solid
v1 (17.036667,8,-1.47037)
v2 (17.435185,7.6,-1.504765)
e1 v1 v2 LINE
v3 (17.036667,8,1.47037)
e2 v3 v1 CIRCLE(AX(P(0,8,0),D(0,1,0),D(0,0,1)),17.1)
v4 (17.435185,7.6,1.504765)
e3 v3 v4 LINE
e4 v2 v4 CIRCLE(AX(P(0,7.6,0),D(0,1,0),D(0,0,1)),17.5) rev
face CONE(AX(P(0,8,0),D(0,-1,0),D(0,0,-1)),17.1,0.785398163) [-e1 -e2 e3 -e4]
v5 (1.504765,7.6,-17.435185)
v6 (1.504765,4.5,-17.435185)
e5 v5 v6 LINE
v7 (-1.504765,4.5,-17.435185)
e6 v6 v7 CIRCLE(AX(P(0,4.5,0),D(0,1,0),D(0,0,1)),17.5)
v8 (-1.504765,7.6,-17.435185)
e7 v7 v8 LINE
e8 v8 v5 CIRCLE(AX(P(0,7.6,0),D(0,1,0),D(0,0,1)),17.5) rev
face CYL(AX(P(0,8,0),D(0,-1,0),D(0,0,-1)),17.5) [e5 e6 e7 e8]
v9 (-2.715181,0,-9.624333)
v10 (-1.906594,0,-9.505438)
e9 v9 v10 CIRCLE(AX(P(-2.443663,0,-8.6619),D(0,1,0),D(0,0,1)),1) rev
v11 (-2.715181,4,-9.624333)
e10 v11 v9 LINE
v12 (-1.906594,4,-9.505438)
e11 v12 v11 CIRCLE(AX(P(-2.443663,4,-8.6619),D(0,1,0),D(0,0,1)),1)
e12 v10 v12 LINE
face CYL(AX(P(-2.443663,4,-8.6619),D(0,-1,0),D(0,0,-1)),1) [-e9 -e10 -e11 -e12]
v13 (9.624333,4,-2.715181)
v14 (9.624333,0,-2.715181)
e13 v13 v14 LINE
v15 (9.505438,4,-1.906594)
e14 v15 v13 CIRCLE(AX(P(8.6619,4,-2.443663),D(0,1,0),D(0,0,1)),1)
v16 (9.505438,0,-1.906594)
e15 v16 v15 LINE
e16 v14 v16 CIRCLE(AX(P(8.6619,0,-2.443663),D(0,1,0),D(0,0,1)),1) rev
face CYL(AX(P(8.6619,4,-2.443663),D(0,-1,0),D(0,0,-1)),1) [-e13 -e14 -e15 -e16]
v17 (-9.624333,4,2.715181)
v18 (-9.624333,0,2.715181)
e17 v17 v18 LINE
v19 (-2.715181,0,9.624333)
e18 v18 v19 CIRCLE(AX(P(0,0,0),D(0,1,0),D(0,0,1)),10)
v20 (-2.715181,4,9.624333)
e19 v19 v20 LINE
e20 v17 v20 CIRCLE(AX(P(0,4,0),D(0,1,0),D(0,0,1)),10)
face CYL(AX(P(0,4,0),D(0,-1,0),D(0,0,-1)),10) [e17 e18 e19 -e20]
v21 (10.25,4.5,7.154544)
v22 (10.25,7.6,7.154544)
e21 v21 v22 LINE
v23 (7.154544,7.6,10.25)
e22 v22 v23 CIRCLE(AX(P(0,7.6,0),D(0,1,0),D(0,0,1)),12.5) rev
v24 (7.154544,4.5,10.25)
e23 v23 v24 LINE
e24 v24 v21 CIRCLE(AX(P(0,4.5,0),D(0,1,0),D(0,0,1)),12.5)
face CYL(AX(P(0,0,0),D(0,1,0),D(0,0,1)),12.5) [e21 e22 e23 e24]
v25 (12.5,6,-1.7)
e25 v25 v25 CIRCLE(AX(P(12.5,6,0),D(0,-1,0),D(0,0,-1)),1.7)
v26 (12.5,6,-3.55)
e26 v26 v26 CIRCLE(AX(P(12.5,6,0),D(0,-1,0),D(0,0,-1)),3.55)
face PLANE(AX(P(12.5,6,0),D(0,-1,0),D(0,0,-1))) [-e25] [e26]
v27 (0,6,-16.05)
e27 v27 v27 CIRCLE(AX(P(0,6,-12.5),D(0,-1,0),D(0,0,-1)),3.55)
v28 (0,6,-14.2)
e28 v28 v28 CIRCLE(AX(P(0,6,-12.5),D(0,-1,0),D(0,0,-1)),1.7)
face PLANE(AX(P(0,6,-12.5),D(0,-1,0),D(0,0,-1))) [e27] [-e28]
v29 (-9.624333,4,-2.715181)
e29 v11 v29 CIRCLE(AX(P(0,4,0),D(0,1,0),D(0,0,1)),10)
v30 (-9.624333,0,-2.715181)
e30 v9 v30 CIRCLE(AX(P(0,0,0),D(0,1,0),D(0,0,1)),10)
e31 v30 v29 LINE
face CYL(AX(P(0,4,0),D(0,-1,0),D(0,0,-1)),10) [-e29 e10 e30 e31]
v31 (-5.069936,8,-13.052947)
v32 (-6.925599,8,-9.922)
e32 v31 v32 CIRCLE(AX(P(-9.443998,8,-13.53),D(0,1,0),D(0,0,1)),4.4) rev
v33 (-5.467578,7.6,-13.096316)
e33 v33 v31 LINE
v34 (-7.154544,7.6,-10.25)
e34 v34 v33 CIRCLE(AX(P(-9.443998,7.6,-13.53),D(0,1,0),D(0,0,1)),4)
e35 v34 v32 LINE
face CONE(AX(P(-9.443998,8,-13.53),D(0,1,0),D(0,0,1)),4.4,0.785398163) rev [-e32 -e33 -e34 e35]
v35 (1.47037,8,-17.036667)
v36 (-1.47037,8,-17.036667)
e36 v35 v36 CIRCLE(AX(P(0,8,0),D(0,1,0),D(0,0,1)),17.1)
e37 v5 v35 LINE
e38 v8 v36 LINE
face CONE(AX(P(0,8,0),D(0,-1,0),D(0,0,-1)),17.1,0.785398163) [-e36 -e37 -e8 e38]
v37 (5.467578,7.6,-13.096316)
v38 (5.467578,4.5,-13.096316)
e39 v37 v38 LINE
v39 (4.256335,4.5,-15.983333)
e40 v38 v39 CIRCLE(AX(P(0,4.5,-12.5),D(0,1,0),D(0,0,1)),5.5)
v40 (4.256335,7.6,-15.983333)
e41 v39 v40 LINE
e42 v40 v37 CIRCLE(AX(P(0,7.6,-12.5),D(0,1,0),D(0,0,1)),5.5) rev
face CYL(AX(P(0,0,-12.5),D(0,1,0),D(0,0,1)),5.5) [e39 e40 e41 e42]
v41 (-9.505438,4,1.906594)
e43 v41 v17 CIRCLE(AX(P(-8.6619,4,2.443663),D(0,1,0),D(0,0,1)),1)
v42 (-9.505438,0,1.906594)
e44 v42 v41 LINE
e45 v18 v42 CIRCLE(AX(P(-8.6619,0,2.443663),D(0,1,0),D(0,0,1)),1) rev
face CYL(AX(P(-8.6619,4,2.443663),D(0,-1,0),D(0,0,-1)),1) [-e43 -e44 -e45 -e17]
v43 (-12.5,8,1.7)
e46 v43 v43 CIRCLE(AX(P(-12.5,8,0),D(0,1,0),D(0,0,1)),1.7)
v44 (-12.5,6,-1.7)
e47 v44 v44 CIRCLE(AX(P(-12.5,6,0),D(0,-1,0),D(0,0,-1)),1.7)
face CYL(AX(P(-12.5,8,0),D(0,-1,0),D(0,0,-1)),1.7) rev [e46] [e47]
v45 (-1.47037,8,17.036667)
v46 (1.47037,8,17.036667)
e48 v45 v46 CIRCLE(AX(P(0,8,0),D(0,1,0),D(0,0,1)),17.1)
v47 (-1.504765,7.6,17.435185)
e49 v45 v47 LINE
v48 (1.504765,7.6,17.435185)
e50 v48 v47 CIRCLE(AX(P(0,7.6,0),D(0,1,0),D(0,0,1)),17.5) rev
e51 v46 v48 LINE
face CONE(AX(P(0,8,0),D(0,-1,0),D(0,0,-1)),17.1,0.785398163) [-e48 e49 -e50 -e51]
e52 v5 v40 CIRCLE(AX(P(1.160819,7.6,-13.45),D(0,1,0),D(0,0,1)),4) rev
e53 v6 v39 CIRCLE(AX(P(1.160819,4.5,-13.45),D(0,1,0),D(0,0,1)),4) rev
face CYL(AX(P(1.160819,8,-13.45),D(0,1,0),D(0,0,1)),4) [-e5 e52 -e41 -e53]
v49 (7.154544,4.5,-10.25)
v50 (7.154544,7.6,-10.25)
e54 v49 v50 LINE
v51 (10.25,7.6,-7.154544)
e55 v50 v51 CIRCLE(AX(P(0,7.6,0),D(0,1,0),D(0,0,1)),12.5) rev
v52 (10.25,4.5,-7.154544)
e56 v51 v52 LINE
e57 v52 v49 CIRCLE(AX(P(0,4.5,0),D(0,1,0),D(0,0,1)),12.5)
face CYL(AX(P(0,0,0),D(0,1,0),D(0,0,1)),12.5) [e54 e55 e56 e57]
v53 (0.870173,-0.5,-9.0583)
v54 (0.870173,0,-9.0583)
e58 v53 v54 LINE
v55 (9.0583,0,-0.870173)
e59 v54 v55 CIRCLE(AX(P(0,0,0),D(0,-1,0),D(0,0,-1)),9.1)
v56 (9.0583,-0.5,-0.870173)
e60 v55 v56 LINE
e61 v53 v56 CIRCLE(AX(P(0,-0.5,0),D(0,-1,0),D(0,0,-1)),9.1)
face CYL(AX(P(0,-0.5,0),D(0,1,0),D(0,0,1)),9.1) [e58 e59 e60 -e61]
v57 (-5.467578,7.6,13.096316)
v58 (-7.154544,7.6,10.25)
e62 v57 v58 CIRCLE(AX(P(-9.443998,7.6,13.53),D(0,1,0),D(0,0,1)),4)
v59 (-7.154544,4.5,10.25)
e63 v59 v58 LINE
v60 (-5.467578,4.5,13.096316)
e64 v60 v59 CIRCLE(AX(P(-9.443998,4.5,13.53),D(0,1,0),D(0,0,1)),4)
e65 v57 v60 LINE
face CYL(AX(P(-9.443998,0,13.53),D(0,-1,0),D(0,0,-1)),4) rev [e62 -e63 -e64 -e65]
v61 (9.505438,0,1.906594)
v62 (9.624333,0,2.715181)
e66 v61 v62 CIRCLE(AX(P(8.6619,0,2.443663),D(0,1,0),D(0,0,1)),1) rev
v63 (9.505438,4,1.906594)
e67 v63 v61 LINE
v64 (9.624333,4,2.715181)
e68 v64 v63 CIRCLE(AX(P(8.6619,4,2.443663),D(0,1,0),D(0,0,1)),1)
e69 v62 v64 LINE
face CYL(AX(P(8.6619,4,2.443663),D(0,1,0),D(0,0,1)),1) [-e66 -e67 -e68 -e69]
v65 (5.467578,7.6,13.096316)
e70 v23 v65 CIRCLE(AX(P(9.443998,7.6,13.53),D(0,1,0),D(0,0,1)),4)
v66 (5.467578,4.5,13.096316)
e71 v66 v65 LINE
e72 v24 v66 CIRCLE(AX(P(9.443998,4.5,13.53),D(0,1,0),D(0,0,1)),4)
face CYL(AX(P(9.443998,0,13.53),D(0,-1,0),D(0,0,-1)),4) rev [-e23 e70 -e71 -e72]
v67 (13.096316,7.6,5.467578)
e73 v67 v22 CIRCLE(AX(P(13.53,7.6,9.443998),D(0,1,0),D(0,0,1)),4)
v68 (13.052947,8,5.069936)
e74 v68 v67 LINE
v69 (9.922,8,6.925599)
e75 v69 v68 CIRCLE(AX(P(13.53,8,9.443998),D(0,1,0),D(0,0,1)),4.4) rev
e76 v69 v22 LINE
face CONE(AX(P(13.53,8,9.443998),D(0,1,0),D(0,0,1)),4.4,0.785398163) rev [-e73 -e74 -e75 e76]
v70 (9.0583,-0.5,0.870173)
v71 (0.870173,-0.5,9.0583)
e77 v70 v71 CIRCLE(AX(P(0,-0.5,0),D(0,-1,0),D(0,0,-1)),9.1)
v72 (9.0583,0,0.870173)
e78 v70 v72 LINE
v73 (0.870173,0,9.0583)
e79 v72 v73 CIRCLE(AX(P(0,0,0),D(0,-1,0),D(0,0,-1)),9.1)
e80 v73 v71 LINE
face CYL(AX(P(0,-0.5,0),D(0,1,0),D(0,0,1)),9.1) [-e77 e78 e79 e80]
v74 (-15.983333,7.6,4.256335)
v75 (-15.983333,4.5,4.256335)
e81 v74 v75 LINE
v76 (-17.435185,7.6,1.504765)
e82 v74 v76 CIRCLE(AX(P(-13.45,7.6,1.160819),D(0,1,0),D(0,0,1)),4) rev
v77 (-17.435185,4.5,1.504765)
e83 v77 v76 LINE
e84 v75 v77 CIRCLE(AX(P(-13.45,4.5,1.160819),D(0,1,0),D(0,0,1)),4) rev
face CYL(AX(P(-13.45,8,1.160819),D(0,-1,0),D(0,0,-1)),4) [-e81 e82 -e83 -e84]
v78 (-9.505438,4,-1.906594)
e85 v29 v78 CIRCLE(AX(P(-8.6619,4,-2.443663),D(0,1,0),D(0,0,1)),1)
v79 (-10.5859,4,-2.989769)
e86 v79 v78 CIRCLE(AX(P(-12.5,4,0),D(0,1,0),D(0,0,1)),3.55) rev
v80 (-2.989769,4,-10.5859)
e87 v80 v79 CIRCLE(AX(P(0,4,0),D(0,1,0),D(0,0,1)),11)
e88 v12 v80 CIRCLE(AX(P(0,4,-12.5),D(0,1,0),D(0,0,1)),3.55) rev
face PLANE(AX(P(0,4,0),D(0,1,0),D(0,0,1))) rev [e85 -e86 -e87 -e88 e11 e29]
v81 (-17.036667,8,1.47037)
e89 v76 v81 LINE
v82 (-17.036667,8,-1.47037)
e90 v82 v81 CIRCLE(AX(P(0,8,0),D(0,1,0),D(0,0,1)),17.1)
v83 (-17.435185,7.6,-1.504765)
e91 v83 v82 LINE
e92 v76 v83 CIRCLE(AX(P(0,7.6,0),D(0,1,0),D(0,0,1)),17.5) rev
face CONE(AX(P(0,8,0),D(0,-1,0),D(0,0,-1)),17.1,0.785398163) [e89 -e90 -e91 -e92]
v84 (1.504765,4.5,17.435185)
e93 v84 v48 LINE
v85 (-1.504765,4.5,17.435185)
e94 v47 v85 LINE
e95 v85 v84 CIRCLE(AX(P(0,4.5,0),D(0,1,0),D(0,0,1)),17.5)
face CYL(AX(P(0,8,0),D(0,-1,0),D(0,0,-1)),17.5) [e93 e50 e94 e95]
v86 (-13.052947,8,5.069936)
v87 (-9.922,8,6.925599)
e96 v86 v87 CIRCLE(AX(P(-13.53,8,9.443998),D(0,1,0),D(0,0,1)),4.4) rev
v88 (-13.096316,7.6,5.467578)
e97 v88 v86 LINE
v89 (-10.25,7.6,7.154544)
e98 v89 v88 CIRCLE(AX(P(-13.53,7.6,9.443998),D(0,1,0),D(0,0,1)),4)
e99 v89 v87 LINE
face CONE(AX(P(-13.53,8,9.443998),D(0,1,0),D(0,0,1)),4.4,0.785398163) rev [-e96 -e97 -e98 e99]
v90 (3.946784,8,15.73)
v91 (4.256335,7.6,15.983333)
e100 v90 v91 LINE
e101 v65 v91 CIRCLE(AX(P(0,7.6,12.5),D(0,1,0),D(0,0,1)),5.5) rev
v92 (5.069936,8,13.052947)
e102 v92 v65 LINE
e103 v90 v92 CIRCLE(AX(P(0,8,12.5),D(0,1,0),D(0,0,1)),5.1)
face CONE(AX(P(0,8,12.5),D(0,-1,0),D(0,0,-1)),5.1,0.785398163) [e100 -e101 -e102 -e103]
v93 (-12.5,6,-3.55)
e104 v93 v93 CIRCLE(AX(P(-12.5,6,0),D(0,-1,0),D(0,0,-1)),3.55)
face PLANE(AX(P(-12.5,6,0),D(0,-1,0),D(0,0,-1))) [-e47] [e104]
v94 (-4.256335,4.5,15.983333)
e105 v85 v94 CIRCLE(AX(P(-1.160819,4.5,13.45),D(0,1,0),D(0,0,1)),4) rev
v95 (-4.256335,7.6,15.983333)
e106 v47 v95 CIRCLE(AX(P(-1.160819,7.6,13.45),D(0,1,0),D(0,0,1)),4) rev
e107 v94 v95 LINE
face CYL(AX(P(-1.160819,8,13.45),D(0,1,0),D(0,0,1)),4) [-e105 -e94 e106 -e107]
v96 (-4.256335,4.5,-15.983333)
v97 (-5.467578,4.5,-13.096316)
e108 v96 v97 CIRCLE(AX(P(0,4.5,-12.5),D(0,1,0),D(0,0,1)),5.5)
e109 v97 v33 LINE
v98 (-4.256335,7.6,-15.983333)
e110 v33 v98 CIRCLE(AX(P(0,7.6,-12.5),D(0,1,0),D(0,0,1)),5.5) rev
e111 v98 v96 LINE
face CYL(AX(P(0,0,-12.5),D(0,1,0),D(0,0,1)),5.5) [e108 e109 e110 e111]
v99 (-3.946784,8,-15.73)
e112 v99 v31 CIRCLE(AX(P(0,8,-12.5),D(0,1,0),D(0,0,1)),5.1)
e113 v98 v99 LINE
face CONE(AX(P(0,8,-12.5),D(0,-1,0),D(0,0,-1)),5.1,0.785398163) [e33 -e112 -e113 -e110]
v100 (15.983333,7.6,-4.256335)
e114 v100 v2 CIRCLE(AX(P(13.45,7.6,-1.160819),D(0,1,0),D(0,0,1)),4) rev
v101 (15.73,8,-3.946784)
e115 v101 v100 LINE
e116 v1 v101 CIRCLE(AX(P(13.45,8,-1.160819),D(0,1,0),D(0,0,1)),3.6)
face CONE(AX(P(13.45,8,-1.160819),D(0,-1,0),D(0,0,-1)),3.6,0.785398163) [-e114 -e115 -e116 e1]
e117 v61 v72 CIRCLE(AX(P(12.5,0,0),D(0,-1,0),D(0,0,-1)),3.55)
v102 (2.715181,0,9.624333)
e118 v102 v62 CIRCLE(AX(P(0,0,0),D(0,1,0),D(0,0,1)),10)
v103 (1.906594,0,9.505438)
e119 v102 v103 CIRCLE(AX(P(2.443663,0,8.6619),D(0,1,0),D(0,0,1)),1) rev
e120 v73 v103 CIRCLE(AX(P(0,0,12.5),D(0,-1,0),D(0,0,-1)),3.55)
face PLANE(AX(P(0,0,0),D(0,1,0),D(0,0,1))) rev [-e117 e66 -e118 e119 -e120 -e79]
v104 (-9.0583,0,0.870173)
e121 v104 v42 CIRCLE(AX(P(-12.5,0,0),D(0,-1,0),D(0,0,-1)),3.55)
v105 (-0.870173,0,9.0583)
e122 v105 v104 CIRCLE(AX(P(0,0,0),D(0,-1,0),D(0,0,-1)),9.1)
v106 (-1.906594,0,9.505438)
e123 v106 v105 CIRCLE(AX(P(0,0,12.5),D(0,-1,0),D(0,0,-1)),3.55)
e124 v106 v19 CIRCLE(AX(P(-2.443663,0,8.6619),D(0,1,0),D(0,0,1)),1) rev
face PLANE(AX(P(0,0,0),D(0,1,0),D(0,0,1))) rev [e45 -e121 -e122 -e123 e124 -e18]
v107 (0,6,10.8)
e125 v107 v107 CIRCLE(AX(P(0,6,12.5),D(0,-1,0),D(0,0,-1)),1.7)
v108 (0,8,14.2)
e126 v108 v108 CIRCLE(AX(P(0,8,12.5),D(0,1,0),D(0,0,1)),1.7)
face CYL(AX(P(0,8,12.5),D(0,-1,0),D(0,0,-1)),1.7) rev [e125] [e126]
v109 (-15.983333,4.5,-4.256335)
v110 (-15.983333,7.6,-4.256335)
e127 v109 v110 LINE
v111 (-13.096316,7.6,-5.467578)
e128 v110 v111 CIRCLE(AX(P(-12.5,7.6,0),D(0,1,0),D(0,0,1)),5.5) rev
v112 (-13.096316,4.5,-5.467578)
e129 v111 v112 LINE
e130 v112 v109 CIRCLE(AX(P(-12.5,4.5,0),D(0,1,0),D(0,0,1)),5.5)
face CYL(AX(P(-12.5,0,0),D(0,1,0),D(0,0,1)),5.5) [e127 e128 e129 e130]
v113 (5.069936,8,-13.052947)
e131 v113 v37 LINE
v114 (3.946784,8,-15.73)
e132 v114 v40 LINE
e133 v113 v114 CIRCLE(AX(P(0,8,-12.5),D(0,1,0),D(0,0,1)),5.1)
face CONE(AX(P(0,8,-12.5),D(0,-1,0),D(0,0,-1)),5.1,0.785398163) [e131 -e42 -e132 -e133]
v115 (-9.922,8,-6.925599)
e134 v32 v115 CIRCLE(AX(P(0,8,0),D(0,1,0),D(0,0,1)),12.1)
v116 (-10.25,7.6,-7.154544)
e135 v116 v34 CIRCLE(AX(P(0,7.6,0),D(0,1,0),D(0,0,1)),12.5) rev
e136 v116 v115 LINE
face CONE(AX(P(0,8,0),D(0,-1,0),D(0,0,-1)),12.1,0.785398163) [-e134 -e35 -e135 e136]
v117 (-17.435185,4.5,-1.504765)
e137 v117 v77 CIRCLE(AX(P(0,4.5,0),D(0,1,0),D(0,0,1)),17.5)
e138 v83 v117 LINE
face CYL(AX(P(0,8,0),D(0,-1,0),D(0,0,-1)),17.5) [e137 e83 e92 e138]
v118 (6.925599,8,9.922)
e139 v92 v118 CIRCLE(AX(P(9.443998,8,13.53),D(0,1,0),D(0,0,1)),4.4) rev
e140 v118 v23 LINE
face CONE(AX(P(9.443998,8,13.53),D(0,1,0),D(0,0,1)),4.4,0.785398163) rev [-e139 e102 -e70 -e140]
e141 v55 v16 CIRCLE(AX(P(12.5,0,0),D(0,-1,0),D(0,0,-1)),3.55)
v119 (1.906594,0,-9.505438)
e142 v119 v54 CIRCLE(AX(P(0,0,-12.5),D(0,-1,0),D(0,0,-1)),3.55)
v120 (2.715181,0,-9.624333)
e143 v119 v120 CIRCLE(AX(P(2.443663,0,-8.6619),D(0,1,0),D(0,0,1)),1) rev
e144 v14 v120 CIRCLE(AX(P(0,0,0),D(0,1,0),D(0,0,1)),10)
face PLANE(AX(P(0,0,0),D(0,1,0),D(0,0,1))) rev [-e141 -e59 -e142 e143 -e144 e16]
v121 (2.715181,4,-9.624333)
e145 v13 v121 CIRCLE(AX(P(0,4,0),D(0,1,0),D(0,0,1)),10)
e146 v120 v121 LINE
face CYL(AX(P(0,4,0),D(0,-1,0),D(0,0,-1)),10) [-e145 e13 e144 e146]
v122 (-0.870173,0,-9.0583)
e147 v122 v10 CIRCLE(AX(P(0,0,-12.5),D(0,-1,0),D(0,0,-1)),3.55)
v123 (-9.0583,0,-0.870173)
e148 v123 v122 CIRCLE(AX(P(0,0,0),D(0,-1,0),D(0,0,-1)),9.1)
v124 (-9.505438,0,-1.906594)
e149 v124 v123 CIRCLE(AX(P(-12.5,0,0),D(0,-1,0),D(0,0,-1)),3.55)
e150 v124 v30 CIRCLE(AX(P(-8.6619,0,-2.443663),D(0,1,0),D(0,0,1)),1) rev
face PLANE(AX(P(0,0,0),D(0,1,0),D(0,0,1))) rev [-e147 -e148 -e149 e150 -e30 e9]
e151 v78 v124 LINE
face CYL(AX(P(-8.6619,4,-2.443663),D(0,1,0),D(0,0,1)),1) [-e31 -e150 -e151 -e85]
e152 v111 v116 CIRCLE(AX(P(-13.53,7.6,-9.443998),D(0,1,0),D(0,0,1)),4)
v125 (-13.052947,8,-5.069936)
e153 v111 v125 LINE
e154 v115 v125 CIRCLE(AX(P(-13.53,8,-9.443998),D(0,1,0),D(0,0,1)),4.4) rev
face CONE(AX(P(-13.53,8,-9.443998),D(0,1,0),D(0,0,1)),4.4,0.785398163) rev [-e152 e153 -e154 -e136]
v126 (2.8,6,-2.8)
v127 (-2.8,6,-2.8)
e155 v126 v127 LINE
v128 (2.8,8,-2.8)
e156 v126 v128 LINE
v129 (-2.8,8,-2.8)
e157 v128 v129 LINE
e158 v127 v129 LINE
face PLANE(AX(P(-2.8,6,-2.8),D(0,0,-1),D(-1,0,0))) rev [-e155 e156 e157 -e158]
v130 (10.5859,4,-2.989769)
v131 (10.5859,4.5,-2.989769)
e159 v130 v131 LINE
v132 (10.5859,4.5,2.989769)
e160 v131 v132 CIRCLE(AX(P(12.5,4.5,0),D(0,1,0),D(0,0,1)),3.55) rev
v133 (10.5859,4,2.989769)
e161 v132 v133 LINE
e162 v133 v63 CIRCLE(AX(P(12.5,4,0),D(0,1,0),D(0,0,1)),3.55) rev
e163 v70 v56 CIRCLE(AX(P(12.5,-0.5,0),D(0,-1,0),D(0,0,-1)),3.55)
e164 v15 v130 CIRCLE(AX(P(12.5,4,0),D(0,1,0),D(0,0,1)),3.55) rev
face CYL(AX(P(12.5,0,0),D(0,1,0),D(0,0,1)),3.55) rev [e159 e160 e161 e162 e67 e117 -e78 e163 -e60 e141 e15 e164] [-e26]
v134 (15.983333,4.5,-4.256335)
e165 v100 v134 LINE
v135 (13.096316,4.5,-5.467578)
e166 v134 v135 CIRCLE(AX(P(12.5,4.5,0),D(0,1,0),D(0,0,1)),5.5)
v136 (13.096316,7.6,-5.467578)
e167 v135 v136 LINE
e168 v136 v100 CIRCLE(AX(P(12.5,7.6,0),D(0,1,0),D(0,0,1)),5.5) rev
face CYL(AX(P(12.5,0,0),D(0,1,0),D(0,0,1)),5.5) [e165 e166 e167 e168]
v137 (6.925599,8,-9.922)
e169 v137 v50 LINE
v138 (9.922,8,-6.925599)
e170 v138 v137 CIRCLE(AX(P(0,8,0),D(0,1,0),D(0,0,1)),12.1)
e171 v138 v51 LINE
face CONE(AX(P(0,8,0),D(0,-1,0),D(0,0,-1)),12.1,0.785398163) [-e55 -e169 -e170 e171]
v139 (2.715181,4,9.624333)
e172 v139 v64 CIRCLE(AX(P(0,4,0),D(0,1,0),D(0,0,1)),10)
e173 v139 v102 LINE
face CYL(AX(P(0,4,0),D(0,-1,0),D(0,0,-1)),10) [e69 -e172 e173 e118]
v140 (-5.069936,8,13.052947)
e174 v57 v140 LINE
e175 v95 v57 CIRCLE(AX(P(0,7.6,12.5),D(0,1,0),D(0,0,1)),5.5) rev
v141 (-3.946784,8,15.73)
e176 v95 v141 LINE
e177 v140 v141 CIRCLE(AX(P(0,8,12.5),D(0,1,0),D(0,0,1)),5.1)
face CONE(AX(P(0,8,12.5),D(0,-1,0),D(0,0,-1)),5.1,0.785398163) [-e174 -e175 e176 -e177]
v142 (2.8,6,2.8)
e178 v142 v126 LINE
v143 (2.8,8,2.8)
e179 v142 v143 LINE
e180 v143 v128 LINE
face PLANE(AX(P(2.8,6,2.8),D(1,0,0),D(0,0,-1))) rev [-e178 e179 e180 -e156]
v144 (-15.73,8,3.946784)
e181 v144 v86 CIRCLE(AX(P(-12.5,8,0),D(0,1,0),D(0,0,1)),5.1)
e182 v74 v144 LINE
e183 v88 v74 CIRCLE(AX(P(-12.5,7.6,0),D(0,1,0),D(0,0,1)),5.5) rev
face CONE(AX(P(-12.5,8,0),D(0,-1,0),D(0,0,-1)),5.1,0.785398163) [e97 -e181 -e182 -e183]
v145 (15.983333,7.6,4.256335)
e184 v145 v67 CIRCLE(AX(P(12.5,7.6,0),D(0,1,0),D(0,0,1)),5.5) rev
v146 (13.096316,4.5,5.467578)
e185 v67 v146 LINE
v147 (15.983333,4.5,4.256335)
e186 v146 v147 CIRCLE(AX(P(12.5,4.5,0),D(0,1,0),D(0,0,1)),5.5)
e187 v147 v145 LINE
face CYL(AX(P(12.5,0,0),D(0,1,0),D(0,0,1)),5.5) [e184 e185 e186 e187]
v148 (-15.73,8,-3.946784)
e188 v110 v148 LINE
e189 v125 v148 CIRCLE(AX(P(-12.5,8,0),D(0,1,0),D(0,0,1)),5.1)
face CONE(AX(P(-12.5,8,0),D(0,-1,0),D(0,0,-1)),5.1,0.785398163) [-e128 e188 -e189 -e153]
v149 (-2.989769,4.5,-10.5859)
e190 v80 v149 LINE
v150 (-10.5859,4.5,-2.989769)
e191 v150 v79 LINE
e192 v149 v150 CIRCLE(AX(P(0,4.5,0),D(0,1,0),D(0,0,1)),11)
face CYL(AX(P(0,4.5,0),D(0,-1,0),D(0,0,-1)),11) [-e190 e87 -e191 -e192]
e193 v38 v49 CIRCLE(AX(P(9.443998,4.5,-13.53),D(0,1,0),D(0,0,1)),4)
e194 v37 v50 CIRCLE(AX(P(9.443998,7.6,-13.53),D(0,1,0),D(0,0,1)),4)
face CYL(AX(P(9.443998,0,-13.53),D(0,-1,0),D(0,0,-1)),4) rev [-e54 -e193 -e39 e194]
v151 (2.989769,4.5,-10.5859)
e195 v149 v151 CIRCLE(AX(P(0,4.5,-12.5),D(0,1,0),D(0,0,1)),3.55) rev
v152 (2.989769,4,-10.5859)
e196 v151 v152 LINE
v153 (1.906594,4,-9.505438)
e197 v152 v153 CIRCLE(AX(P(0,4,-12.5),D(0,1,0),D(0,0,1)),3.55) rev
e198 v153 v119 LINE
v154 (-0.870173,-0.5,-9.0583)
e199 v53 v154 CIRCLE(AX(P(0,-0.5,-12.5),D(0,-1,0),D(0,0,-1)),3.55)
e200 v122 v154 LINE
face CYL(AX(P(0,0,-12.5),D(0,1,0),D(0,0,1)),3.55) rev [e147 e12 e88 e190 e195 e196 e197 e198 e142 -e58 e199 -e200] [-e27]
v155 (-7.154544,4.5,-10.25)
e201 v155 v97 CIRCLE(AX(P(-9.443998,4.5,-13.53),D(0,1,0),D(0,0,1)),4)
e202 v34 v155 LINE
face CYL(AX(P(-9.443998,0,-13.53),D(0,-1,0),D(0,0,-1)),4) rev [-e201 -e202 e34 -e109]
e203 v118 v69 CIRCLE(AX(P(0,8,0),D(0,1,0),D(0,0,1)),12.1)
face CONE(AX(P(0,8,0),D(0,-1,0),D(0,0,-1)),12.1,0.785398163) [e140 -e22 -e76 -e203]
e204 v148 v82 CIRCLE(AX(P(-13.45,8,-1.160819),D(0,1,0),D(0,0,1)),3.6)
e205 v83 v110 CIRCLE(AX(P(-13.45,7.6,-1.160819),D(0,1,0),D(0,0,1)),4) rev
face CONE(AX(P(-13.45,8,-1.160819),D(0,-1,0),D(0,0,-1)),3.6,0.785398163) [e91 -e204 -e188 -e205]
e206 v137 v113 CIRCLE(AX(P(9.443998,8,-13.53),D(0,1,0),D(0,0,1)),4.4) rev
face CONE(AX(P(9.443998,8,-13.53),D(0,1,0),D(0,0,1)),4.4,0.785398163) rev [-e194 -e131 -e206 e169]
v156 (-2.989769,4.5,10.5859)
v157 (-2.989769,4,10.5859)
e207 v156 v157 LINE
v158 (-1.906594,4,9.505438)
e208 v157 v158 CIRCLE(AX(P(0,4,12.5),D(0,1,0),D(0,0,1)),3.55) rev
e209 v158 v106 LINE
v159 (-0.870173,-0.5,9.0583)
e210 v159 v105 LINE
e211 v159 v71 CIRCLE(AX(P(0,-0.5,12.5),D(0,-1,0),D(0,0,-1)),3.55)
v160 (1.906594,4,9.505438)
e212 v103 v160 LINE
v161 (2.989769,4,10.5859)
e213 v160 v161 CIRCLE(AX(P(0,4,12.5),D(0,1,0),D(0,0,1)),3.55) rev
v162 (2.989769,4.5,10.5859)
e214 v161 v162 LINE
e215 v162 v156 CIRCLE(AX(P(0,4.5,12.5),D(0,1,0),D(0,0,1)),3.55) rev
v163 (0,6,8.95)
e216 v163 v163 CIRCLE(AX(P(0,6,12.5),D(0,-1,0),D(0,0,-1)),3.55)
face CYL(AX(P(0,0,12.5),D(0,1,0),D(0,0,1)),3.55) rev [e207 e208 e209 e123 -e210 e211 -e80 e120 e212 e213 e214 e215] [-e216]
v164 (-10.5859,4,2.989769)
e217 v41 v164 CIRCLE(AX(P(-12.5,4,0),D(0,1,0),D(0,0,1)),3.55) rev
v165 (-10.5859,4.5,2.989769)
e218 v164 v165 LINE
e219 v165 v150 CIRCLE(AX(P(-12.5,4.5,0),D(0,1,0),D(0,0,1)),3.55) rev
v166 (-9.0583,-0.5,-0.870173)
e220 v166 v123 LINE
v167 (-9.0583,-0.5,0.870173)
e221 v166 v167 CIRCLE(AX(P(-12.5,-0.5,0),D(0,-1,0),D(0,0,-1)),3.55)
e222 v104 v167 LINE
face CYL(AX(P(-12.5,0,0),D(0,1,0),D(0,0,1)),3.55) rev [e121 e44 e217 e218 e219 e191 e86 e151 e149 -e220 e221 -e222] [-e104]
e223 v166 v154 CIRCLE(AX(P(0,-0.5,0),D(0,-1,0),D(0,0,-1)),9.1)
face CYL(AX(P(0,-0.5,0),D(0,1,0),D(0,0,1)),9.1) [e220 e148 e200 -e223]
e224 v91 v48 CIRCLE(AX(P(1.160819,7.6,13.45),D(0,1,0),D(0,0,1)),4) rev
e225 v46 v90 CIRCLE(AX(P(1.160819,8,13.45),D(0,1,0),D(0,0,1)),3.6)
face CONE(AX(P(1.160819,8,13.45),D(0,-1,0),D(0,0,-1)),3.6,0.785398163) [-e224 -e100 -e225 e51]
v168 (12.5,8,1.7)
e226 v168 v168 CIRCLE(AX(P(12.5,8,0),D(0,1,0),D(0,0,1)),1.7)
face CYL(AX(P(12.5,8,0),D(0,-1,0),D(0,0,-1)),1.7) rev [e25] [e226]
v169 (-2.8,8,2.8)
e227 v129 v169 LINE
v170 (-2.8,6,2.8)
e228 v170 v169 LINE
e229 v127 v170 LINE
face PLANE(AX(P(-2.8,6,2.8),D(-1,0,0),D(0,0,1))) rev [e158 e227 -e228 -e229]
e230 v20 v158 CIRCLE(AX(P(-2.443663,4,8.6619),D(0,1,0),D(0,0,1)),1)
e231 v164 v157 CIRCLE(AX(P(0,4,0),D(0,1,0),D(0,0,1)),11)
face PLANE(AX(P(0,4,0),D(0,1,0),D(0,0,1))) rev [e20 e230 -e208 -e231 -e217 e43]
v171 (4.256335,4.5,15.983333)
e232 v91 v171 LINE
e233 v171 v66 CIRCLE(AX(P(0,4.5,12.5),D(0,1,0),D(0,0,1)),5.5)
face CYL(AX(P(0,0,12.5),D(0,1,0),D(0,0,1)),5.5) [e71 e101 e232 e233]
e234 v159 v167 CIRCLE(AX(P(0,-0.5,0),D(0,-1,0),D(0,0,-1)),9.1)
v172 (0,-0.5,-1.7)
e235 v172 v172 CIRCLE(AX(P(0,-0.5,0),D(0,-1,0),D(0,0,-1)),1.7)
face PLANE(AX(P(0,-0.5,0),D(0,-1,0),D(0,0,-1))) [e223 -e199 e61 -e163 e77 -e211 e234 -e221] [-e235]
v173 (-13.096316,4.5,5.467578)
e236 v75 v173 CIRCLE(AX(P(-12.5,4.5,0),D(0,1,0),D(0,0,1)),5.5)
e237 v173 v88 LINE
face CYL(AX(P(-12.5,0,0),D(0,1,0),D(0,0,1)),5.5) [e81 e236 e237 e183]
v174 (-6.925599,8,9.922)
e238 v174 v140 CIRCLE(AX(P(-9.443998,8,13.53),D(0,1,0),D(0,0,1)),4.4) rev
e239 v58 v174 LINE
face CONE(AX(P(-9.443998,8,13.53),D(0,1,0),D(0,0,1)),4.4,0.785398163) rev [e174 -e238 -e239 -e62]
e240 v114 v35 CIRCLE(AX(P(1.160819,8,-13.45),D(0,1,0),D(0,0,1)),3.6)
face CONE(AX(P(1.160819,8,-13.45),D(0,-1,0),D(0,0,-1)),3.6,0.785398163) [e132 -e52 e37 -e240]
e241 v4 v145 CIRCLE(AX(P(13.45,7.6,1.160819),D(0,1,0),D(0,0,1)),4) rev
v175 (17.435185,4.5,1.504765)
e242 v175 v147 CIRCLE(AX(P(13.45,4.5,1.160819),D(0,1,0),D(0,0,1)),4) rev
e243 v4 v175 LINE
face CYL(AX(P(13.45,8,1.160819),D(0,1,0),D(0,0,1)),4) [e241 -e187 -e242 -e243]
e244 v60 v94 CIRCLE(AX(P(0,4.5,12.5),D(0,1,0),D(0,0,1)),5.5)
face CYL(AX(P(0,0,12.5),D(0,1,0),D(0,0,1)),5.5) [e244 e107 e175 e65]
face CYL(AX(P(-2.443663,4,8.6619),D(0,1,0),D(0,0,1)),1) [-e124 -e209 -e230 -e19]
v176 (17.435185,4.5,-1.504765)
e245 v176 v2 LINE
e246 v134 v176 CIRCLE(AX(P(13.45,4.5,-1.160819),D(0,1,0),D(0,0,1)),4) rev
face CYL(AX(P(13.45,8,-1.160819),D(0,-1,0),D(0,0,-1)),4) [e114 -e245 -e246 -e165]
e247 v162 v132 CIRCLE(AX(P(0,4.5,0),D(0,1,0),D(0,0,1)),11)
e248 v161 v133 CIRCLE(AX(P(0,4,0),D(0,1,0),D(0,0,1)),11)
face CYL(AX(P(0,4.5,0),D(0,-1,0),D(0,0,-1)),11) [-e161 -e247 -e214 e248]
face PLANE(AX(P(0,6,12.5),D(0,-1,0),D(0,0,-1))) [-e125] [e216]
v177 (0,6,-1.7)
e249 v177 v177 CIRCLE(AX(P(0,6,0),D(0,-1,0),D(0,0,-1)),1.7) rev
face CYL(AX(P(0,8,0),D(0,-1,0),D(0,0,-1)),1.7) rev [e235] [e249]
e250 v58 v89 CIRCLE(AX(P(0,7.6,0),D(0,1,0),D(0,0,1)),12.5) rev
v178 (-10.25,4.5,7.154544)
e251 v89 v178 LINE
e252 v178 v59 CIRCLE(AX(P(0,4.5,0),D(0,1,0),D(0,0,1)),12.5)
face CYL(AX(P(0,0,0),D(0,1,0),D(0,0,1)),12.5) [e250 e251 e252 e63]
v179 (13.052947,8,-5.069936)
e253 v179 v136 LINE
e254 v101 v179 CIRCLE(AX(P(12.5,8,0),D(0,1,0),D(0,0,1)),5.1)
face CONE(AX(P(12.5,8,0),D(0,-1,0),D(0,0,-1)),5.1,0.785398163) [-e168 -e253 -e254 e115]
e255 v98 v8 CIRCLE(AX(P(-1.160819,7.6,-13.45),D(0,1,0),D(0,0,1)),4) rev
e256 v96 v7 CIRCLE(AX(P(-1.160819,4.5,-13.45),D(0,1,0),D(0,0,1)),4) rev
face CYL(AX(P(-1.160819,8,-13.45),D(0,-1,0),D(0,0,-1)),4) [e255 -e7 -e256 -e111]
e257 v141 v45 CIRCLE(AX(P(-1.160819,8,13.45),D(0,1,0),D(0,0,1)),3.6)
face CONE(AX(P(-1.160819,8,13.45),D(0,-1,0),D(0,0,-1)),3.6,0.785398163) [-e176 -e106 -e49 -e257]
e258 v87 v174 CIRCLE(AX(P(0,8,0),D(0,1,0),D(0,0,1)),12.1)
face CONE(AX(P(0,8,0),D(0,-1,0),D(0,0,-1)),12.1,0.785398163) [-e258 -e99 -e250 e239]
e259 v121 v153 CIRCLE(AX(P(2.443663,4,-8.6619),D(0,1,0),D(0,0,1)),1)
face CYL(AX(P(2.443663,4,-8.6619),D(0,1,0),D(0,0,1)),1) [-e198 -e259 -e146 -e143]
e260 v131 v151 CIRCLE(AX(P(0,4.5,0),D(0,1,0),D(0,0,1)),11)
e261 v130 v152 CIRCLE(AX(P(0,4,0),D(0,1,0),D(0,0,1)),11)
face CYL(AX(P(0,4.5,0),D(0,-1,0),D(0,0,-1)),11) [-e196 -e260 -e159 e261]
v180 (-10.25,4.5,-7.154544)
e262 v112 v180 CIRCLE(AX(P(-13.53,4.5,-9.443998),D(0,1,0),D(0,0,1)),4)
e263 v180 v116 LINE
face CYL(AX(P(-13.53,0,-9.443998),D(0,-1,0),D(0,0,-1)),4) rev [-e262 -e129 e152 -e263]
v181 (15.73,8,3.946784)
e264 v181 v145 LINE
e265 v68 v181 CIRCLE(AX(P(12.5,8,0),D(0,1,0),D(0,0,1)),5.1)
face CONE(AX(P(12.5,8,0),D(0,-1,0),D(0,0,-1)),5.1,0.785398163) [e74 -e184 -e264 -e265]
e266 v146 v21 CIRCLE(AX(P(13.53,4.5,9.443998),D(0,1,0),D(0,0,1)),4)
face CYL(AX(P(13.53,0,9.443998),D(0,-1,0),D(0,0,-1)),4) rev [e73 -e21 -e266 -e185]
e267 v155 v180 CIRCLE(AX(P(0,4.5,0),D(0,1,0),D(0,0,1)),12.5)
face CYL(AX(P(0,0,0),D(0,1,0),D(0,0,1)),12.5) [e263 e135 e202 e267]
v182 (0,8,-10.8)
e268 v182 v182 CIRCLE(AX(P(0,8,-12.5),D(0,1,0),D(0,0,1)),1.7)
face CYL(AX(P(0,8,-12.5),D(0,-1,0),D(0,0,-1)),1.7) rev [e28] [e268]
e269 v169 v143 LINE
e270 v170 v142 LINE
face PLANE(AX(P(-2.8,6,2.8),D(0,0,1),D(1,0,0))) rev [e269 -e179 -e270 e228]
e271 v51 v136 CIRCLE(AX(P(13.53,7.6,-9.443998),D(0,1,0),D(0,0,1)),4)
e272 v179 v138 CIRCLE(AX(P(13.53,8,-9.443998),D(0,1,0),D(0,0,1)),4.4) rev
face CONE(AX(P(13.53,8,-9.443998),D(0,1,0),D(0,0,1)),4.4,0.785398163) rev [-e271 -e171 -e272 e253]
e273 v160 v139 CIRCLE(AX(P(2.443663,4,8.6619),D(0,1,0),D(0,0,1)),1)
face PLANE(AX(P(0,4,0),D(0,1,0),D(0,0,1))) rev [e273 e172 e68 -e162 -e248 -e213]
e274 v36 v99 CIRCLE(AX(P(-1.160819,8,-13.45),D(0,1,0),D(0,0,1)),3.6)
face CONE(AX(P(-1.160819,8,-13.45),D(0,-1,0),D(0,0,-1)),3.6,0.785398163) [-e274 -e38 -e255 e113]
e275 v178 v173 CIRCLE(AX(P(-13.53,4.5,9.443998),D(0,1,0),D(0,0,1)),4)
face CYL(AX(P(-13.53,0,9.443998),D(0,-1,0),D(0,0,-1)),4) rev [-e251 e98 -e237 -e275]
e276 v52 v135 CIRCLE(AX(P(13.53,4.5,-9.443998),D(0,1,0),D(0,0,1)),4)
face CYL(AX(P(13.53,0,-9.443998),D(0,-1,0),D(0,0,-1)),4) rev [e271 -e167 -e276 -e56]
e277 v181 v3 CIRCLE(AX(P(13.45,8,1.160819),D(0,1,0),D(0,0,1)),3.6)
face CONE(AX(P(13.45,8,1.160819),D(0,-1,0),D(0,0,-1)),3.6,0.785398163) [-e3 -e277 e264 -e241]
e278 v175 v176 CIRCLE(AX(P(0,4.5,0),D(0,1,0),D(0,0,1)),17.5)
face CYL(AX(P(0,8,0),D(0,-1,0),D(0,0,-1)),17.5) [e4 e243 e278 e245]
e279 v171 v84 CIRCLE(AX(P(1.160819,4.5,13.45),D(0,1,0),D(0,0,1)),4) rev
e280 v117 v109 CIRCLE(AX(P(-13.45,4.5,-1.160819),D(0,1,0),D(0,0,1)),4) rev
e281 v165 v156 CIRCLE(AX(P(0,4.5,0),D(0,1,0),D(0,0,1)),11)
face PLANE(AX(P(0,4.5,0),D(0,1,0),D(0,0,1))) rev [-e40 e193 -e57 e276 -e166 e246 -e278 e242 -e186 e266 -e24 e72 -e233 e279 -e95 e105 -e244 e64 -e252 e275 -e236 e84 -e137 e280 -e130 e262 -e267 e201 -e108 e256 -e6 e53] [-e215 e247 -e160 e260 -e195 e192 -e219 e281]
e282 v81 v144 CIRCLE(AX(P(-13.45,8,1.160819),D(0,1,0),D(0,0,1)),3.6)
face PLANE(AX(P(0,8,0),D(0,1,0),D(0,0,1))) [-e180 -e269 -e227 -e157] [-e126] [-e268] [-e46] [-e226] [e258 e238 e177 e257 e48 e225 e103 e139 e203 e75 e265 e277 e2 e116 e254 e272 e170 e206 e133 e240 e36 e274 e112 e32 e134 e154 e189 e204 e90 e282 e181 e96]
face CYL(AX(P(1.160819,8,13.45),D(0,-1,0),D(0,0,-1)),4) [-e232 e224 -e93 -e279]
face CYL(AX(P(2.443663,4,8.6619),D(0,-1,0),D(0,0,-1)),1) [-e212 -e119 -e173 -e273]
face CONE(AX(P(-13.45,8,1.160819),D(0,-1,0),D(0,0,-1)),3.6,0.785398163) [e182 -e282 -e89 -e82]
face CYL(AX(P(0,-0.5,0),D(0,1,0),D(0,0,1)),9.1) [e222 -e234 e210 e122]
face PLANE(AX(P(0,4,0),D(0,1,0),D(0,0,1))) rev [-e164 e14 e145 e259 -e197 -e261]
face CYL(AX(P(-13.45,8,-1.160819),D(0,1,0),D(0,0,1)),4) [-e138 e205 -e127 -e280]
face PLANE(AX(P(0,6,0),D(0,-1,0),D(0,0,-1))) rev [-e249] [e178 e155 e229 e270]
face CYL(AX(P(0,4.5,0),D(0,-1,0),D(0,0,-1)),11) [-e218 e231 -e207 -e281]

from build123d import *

# Parameters (mm, degrees)
ESQUISSE1_R                  = 10
BOSS_EXTRU_1_DEPTH           = 4
ESQUISSE8_R                  = 11
BOSS_EXTRU_4_DEPTH           = 0.5
ESQUISSE3_R                  = 17.5
ESQUISSE3_R_2                = 1.7
BOSS_EXTRU_2_DEPTH           = 3.5
ENL_V_MAT_EXTRU_2_DEPTH      = 26.154522456
ENL_V_MAT_EXTRU_2_DEPTH_BACK = 1.5
ESQUISSE4_R                  = 3.55
ESQUISSE11_OUTSIDE_W         = 47.028
ESQUISSE11_OUTSIDE_H         = 47.028
ENL_V_MAT_EXTRU_3_DEPTH      = 27.009613607
CONG_1_R                     = 4
CONG_2_R                     = 1
CHANFREIN2_SIZE              = 0.4
ESQUISSE12_R                 = 1.7
ENL_V_MAT_EXTRU_4_DEPTH      = 27.009613773
ESQUISSE13_W                 = 5.6
ESQUISSE13_H                 = 5.6
ENL_V_MAT_EXTRU_5_DEPTH      = 2
BOSS_EXTRU_5_START           = 0.5
ESQUISSE14_R                 = 9.1
ESQUISSE14_R_2               = 1.7
BOSS_EXTRU_5_DEPTH           = 0.5
ESQUISSE15_R                 = 3.55
ENL_V_MAT_EXTRU_6_DEPTH      = 0.5


with BuildPart() as part:
    # Esquisse1 → Boss.-Extru.1 (new body)
    with BuildSketch(Plane(origin=(0, 0, 0), x_dir=(1, 0, 0), z_dir=(0, 1, 0))):
        Circle(ESQUISSE1_R)
    extrude(amount=BOSS_EXTRU_1_DEPTH)

    # Esquisse8 → Boss.-Extru.4 (add)
    with BuildSketch(Plane(origin=(0, 4, 0), x_dir=(1, 0, 0), z_dir=(0, 1, 0))):
        Circle(ESQUISSE8_R)
    extrude(amount=BOSS_EXTRU_4_DEPTH)

    # Esquisse3 → Boss.-Extru.2 (add)
    with BuildSketch(Plane(origin=(0, 4.5, 0), x_dir=(1, 0, 0), z_dir=(0, 1, 0))):
        Circle(ESQUISSE3_R)
        with Locations((-12.5, 0)):
            Circle(ESQUISSE3_R_2, mode=Mode.SUBTRACT)
        with Locations((0, 12.5)):
            Circle(ESQUISSE3_R_2, mode=Mode.SUBTRACT)
        with Locations((12.5, 0)):
            Circle(ESQUISSE3_R_2, mode=Mode.SUBTRACT)
        with Locations((0, -12.5)):
            Circle(ESQUISSE3_R_2, mode=Mode.SUBTRACT)
    extrude(amount=BOSS_EXTRU_2_DEPTH)

    # Esquisse4 → Enlèv. mat.-Extru.2 (cut, two sides: drawn at the far end of the back side and taken through both)
    with BuildSketch(Plane.XZ.offset(-4.5).offset(-ENL_V_MAT_EXTRU_2_DEPTH_BACK)):
        with Locations((0, -12.5)):
            Circle(ESQUISSE4_R)
        with Locations((-12.5, 0)):
            Circle(ESQUISSE4_R)
        with Locations((0, 12.5)):
            Circle(ESQUISSE4_R)
        with Locations((12.5, 0)):
            Circle(ESQUISSE4_R)
    extrude(amount=ENL_V_MAT_EXTRU_2_DEPTH + ENL_V_MAT_EXTRU_2_DEPTH_BACK, mode=Mode.SUBTRACT)

    # Esquisse11 outside → Enlèv. mat.-Extru.3 (cut, through all)
    with BuildSketch(Plane(origin=(0, 8, 0), x_dir=(1, 0, 0), z_dir=(0, 1, 0))):
        Rectangle(ESQUISSE11_OUTSIDE_W, ESQUISSE11_OUTSIDE_H)
        with BuildLine():
            ThreePointArc((-5.365249295, -11.29), (0, -18), (5.365249295, -11.29))
            ThreePointArc((5.365249295, -11.29), (8.838834765, -8.838834765), (11.29, -5.365249295))
            ThreePointArc((11.29, -5.365249295), (18, 0), (11.29, 5.365249295))
            ThreePointArc((11.29, 5.365249295), (8.838834765, 8.838834765), (5.365249295, 11.29))
            ThreePointArc((5.365249295, 11.29), (0, 18), (-5.365249295, 11.29))
            ThreePointArc((-5.365249295, 11.29), (-8.838834765, 8.838834765), (-11.29, 5.365249295))
            ThreePointArc((-11.29, 5.365249295), (-18, 0), (-11.29, -5.365249295))
            ThreePointArc((-11.29, -5.365249295), (-8.838834765, -8.838834765), (-5.365249295, -11.29))
        make_face(mode=Mode.SUBTRACT)
    extrude(amount=-ENL_V_MAT_EXTRU_3_DEPTH, mode=Mode.SUBTRACT)

    # Congé1
    cong_1_edges = [part.edges().sort_by_distance(p)[0] for p in [
        (-11.29, 6.25, -5.365249295),
        (-5.365249295, 6.25, -11.29),
        (5.365249295, 6.25, -11.29),
        (11.29, 6.25, -5.365249295),
        (11.29, 6.25, 5.365249295),
        (5.365249295, 6.25, 11.29),
        (-11.29, 6.25, 5.365249295),
        (-5.365249295, 6.25, 11.29),
        (-17.29, 6.25, -2.702942841),
        (-17.29, 6.25, 2.702942841),
        (-2.702942841, 6.25, -17.29),
        (2.702942841, 6.25, -17.29),
        (17.29, 6.25, -2.702942841),
        (17.29, 6.25, 2.702942841),
        (-2.702942841, 6.25, 17.29),
        (2.702942841, 6.25, 17.29),
    ]]
    fillet(cong_1_edges, radius=CONG_1_R)

    # Congé2
    cong_2_edges = [part.edges().sort_by_distance(p)[0] for p in [
        (2.239962765, 2, 9.7459),
        (-2.239962765, 2, 9.7459),
        (-9.7459, 2, 2.239962765),
        (-9.7459, 2, -2.239962765),
        (-2.239962765, 2, -9.7459),
        (2.239962765, 2, -9.7459),
        (9.7459, 2, 2.239962765),
        (9.7459, 2, -2.239962765),
    ]]
    fillet(cong_2_edges, radius=CONG_2_R)

    # Chanfrein2
    chanfrein2_edges = [part.edges().sort_by_distance(p)[0] for p in [
        (3.027485343, 8, -16.98773311),
        (0, 8, -17.5),
        (5.071719486, 8, -14.627830223),
        (-3.027485343, 8, -16.98773311),
        (6.002970096, 8, -11.490557352),
        (-5.071719486, 8, -14.627830223),
        (8.838834765, 8, -8.838834765),
        (-6.002970096, 8, -11.490557352),
        (11.490557352, 8, -6.002970096),
        (-8.838834765, 8, -8.838834765),
        (14.627830223, 8, -5.071719486),
        (-11.490557352, 8, -6.002970096),
        (16.98773311, 8, -3.027485343),
        (-14.627830223, 8, -5.071719486),
        (17.5, 8, 0),
        (-16.98773311, 8, -3.027485343),
        (16.98773311, 8, 3.027485343),
        (-17.5, 8, 0),
        (14.627830223, 8, 5.071719486),
        (-16.98773311, 8, 3.027485343),
        (11.490557352, 8, 6.002970096),
        (-14.627830223, 8, 5.071719486),
        (8.838834765, 8, 8.838834765),
        (-11.490557352, 8, 6.002970096),
        (6.002970096, 8, 11.490557352),
        (-8.838834765, 8, 8.838834765),
        (5.071719486, 8, 14.627830223),
        (-6.002970096, 8, 11.490557352),
        (3.027485343, 8, 16.98773311),
        (-5.071719486, 8, 14.627830223),
        (0, 8, 17.5),
        (-3.027485343, 8, 16.98773311),
    ]]
    chamfer(chanfrein2_edges, length=CHANFREIN2_SIZE)

    # Esquisse12 → Enlèv. mat.-Extru.4 (cut, through all)
    with BuildSketch(Plane.XZ):
        Circle(ESQUISSE12_R)
    extrude(amount=-ENL_V_MAT_EXTRU_4_DEPTH, mode=Mode.SUBTRACT)

    # Esquisse13 → Enlèv. mat.-Extru.5 (cut)
    with BuildSketch(Plane(origin=(0, 8, 0), x_dir=(1, 0, 0), z_dir=(0, 1, 0))):
        Rectangle(ESQUISSE13_W, ESQUISSE13_H)
    extrude(amount=-ENL_V_MAT_EXTRU_5_DEPTH, mode=Mode.SUBTRACT)

    # Esquisse14 → Boss.-Extru.5 (add)
    with BuildSketch(Plane.XZ.offset(BOSS_EXTRU_5_START)):
        Circle(ESQUISSE14_R)
        Circle(ESQUISSE14_R_2, mode=Mode.SUBTRACT)
    extrude(amount=-BOSS_EXTRU_5_DEPTH)

    # Esquisse15 → Enlèv. mat.-Extru.6 (cut)
    with BuildSketch(Plane.XZ.offset(0.5)):
        with Locations((12.5, 0)):
            Circle(ESQUISSE15_R)
        with Locations((0, 12.5)):
            Circle(ESQUISSE15_R)
        with Locations((-12.5, 0)):
            Circle(ESQUISSE15_R)
        with Locations((0, -12.5)):
            Circle(ESQUISSE15_R)
    extrude(amount=-ENL_V_MAT_EXTRU_6_DEPTH, mode=Mode.SUBTRACT)


solid = part.part
